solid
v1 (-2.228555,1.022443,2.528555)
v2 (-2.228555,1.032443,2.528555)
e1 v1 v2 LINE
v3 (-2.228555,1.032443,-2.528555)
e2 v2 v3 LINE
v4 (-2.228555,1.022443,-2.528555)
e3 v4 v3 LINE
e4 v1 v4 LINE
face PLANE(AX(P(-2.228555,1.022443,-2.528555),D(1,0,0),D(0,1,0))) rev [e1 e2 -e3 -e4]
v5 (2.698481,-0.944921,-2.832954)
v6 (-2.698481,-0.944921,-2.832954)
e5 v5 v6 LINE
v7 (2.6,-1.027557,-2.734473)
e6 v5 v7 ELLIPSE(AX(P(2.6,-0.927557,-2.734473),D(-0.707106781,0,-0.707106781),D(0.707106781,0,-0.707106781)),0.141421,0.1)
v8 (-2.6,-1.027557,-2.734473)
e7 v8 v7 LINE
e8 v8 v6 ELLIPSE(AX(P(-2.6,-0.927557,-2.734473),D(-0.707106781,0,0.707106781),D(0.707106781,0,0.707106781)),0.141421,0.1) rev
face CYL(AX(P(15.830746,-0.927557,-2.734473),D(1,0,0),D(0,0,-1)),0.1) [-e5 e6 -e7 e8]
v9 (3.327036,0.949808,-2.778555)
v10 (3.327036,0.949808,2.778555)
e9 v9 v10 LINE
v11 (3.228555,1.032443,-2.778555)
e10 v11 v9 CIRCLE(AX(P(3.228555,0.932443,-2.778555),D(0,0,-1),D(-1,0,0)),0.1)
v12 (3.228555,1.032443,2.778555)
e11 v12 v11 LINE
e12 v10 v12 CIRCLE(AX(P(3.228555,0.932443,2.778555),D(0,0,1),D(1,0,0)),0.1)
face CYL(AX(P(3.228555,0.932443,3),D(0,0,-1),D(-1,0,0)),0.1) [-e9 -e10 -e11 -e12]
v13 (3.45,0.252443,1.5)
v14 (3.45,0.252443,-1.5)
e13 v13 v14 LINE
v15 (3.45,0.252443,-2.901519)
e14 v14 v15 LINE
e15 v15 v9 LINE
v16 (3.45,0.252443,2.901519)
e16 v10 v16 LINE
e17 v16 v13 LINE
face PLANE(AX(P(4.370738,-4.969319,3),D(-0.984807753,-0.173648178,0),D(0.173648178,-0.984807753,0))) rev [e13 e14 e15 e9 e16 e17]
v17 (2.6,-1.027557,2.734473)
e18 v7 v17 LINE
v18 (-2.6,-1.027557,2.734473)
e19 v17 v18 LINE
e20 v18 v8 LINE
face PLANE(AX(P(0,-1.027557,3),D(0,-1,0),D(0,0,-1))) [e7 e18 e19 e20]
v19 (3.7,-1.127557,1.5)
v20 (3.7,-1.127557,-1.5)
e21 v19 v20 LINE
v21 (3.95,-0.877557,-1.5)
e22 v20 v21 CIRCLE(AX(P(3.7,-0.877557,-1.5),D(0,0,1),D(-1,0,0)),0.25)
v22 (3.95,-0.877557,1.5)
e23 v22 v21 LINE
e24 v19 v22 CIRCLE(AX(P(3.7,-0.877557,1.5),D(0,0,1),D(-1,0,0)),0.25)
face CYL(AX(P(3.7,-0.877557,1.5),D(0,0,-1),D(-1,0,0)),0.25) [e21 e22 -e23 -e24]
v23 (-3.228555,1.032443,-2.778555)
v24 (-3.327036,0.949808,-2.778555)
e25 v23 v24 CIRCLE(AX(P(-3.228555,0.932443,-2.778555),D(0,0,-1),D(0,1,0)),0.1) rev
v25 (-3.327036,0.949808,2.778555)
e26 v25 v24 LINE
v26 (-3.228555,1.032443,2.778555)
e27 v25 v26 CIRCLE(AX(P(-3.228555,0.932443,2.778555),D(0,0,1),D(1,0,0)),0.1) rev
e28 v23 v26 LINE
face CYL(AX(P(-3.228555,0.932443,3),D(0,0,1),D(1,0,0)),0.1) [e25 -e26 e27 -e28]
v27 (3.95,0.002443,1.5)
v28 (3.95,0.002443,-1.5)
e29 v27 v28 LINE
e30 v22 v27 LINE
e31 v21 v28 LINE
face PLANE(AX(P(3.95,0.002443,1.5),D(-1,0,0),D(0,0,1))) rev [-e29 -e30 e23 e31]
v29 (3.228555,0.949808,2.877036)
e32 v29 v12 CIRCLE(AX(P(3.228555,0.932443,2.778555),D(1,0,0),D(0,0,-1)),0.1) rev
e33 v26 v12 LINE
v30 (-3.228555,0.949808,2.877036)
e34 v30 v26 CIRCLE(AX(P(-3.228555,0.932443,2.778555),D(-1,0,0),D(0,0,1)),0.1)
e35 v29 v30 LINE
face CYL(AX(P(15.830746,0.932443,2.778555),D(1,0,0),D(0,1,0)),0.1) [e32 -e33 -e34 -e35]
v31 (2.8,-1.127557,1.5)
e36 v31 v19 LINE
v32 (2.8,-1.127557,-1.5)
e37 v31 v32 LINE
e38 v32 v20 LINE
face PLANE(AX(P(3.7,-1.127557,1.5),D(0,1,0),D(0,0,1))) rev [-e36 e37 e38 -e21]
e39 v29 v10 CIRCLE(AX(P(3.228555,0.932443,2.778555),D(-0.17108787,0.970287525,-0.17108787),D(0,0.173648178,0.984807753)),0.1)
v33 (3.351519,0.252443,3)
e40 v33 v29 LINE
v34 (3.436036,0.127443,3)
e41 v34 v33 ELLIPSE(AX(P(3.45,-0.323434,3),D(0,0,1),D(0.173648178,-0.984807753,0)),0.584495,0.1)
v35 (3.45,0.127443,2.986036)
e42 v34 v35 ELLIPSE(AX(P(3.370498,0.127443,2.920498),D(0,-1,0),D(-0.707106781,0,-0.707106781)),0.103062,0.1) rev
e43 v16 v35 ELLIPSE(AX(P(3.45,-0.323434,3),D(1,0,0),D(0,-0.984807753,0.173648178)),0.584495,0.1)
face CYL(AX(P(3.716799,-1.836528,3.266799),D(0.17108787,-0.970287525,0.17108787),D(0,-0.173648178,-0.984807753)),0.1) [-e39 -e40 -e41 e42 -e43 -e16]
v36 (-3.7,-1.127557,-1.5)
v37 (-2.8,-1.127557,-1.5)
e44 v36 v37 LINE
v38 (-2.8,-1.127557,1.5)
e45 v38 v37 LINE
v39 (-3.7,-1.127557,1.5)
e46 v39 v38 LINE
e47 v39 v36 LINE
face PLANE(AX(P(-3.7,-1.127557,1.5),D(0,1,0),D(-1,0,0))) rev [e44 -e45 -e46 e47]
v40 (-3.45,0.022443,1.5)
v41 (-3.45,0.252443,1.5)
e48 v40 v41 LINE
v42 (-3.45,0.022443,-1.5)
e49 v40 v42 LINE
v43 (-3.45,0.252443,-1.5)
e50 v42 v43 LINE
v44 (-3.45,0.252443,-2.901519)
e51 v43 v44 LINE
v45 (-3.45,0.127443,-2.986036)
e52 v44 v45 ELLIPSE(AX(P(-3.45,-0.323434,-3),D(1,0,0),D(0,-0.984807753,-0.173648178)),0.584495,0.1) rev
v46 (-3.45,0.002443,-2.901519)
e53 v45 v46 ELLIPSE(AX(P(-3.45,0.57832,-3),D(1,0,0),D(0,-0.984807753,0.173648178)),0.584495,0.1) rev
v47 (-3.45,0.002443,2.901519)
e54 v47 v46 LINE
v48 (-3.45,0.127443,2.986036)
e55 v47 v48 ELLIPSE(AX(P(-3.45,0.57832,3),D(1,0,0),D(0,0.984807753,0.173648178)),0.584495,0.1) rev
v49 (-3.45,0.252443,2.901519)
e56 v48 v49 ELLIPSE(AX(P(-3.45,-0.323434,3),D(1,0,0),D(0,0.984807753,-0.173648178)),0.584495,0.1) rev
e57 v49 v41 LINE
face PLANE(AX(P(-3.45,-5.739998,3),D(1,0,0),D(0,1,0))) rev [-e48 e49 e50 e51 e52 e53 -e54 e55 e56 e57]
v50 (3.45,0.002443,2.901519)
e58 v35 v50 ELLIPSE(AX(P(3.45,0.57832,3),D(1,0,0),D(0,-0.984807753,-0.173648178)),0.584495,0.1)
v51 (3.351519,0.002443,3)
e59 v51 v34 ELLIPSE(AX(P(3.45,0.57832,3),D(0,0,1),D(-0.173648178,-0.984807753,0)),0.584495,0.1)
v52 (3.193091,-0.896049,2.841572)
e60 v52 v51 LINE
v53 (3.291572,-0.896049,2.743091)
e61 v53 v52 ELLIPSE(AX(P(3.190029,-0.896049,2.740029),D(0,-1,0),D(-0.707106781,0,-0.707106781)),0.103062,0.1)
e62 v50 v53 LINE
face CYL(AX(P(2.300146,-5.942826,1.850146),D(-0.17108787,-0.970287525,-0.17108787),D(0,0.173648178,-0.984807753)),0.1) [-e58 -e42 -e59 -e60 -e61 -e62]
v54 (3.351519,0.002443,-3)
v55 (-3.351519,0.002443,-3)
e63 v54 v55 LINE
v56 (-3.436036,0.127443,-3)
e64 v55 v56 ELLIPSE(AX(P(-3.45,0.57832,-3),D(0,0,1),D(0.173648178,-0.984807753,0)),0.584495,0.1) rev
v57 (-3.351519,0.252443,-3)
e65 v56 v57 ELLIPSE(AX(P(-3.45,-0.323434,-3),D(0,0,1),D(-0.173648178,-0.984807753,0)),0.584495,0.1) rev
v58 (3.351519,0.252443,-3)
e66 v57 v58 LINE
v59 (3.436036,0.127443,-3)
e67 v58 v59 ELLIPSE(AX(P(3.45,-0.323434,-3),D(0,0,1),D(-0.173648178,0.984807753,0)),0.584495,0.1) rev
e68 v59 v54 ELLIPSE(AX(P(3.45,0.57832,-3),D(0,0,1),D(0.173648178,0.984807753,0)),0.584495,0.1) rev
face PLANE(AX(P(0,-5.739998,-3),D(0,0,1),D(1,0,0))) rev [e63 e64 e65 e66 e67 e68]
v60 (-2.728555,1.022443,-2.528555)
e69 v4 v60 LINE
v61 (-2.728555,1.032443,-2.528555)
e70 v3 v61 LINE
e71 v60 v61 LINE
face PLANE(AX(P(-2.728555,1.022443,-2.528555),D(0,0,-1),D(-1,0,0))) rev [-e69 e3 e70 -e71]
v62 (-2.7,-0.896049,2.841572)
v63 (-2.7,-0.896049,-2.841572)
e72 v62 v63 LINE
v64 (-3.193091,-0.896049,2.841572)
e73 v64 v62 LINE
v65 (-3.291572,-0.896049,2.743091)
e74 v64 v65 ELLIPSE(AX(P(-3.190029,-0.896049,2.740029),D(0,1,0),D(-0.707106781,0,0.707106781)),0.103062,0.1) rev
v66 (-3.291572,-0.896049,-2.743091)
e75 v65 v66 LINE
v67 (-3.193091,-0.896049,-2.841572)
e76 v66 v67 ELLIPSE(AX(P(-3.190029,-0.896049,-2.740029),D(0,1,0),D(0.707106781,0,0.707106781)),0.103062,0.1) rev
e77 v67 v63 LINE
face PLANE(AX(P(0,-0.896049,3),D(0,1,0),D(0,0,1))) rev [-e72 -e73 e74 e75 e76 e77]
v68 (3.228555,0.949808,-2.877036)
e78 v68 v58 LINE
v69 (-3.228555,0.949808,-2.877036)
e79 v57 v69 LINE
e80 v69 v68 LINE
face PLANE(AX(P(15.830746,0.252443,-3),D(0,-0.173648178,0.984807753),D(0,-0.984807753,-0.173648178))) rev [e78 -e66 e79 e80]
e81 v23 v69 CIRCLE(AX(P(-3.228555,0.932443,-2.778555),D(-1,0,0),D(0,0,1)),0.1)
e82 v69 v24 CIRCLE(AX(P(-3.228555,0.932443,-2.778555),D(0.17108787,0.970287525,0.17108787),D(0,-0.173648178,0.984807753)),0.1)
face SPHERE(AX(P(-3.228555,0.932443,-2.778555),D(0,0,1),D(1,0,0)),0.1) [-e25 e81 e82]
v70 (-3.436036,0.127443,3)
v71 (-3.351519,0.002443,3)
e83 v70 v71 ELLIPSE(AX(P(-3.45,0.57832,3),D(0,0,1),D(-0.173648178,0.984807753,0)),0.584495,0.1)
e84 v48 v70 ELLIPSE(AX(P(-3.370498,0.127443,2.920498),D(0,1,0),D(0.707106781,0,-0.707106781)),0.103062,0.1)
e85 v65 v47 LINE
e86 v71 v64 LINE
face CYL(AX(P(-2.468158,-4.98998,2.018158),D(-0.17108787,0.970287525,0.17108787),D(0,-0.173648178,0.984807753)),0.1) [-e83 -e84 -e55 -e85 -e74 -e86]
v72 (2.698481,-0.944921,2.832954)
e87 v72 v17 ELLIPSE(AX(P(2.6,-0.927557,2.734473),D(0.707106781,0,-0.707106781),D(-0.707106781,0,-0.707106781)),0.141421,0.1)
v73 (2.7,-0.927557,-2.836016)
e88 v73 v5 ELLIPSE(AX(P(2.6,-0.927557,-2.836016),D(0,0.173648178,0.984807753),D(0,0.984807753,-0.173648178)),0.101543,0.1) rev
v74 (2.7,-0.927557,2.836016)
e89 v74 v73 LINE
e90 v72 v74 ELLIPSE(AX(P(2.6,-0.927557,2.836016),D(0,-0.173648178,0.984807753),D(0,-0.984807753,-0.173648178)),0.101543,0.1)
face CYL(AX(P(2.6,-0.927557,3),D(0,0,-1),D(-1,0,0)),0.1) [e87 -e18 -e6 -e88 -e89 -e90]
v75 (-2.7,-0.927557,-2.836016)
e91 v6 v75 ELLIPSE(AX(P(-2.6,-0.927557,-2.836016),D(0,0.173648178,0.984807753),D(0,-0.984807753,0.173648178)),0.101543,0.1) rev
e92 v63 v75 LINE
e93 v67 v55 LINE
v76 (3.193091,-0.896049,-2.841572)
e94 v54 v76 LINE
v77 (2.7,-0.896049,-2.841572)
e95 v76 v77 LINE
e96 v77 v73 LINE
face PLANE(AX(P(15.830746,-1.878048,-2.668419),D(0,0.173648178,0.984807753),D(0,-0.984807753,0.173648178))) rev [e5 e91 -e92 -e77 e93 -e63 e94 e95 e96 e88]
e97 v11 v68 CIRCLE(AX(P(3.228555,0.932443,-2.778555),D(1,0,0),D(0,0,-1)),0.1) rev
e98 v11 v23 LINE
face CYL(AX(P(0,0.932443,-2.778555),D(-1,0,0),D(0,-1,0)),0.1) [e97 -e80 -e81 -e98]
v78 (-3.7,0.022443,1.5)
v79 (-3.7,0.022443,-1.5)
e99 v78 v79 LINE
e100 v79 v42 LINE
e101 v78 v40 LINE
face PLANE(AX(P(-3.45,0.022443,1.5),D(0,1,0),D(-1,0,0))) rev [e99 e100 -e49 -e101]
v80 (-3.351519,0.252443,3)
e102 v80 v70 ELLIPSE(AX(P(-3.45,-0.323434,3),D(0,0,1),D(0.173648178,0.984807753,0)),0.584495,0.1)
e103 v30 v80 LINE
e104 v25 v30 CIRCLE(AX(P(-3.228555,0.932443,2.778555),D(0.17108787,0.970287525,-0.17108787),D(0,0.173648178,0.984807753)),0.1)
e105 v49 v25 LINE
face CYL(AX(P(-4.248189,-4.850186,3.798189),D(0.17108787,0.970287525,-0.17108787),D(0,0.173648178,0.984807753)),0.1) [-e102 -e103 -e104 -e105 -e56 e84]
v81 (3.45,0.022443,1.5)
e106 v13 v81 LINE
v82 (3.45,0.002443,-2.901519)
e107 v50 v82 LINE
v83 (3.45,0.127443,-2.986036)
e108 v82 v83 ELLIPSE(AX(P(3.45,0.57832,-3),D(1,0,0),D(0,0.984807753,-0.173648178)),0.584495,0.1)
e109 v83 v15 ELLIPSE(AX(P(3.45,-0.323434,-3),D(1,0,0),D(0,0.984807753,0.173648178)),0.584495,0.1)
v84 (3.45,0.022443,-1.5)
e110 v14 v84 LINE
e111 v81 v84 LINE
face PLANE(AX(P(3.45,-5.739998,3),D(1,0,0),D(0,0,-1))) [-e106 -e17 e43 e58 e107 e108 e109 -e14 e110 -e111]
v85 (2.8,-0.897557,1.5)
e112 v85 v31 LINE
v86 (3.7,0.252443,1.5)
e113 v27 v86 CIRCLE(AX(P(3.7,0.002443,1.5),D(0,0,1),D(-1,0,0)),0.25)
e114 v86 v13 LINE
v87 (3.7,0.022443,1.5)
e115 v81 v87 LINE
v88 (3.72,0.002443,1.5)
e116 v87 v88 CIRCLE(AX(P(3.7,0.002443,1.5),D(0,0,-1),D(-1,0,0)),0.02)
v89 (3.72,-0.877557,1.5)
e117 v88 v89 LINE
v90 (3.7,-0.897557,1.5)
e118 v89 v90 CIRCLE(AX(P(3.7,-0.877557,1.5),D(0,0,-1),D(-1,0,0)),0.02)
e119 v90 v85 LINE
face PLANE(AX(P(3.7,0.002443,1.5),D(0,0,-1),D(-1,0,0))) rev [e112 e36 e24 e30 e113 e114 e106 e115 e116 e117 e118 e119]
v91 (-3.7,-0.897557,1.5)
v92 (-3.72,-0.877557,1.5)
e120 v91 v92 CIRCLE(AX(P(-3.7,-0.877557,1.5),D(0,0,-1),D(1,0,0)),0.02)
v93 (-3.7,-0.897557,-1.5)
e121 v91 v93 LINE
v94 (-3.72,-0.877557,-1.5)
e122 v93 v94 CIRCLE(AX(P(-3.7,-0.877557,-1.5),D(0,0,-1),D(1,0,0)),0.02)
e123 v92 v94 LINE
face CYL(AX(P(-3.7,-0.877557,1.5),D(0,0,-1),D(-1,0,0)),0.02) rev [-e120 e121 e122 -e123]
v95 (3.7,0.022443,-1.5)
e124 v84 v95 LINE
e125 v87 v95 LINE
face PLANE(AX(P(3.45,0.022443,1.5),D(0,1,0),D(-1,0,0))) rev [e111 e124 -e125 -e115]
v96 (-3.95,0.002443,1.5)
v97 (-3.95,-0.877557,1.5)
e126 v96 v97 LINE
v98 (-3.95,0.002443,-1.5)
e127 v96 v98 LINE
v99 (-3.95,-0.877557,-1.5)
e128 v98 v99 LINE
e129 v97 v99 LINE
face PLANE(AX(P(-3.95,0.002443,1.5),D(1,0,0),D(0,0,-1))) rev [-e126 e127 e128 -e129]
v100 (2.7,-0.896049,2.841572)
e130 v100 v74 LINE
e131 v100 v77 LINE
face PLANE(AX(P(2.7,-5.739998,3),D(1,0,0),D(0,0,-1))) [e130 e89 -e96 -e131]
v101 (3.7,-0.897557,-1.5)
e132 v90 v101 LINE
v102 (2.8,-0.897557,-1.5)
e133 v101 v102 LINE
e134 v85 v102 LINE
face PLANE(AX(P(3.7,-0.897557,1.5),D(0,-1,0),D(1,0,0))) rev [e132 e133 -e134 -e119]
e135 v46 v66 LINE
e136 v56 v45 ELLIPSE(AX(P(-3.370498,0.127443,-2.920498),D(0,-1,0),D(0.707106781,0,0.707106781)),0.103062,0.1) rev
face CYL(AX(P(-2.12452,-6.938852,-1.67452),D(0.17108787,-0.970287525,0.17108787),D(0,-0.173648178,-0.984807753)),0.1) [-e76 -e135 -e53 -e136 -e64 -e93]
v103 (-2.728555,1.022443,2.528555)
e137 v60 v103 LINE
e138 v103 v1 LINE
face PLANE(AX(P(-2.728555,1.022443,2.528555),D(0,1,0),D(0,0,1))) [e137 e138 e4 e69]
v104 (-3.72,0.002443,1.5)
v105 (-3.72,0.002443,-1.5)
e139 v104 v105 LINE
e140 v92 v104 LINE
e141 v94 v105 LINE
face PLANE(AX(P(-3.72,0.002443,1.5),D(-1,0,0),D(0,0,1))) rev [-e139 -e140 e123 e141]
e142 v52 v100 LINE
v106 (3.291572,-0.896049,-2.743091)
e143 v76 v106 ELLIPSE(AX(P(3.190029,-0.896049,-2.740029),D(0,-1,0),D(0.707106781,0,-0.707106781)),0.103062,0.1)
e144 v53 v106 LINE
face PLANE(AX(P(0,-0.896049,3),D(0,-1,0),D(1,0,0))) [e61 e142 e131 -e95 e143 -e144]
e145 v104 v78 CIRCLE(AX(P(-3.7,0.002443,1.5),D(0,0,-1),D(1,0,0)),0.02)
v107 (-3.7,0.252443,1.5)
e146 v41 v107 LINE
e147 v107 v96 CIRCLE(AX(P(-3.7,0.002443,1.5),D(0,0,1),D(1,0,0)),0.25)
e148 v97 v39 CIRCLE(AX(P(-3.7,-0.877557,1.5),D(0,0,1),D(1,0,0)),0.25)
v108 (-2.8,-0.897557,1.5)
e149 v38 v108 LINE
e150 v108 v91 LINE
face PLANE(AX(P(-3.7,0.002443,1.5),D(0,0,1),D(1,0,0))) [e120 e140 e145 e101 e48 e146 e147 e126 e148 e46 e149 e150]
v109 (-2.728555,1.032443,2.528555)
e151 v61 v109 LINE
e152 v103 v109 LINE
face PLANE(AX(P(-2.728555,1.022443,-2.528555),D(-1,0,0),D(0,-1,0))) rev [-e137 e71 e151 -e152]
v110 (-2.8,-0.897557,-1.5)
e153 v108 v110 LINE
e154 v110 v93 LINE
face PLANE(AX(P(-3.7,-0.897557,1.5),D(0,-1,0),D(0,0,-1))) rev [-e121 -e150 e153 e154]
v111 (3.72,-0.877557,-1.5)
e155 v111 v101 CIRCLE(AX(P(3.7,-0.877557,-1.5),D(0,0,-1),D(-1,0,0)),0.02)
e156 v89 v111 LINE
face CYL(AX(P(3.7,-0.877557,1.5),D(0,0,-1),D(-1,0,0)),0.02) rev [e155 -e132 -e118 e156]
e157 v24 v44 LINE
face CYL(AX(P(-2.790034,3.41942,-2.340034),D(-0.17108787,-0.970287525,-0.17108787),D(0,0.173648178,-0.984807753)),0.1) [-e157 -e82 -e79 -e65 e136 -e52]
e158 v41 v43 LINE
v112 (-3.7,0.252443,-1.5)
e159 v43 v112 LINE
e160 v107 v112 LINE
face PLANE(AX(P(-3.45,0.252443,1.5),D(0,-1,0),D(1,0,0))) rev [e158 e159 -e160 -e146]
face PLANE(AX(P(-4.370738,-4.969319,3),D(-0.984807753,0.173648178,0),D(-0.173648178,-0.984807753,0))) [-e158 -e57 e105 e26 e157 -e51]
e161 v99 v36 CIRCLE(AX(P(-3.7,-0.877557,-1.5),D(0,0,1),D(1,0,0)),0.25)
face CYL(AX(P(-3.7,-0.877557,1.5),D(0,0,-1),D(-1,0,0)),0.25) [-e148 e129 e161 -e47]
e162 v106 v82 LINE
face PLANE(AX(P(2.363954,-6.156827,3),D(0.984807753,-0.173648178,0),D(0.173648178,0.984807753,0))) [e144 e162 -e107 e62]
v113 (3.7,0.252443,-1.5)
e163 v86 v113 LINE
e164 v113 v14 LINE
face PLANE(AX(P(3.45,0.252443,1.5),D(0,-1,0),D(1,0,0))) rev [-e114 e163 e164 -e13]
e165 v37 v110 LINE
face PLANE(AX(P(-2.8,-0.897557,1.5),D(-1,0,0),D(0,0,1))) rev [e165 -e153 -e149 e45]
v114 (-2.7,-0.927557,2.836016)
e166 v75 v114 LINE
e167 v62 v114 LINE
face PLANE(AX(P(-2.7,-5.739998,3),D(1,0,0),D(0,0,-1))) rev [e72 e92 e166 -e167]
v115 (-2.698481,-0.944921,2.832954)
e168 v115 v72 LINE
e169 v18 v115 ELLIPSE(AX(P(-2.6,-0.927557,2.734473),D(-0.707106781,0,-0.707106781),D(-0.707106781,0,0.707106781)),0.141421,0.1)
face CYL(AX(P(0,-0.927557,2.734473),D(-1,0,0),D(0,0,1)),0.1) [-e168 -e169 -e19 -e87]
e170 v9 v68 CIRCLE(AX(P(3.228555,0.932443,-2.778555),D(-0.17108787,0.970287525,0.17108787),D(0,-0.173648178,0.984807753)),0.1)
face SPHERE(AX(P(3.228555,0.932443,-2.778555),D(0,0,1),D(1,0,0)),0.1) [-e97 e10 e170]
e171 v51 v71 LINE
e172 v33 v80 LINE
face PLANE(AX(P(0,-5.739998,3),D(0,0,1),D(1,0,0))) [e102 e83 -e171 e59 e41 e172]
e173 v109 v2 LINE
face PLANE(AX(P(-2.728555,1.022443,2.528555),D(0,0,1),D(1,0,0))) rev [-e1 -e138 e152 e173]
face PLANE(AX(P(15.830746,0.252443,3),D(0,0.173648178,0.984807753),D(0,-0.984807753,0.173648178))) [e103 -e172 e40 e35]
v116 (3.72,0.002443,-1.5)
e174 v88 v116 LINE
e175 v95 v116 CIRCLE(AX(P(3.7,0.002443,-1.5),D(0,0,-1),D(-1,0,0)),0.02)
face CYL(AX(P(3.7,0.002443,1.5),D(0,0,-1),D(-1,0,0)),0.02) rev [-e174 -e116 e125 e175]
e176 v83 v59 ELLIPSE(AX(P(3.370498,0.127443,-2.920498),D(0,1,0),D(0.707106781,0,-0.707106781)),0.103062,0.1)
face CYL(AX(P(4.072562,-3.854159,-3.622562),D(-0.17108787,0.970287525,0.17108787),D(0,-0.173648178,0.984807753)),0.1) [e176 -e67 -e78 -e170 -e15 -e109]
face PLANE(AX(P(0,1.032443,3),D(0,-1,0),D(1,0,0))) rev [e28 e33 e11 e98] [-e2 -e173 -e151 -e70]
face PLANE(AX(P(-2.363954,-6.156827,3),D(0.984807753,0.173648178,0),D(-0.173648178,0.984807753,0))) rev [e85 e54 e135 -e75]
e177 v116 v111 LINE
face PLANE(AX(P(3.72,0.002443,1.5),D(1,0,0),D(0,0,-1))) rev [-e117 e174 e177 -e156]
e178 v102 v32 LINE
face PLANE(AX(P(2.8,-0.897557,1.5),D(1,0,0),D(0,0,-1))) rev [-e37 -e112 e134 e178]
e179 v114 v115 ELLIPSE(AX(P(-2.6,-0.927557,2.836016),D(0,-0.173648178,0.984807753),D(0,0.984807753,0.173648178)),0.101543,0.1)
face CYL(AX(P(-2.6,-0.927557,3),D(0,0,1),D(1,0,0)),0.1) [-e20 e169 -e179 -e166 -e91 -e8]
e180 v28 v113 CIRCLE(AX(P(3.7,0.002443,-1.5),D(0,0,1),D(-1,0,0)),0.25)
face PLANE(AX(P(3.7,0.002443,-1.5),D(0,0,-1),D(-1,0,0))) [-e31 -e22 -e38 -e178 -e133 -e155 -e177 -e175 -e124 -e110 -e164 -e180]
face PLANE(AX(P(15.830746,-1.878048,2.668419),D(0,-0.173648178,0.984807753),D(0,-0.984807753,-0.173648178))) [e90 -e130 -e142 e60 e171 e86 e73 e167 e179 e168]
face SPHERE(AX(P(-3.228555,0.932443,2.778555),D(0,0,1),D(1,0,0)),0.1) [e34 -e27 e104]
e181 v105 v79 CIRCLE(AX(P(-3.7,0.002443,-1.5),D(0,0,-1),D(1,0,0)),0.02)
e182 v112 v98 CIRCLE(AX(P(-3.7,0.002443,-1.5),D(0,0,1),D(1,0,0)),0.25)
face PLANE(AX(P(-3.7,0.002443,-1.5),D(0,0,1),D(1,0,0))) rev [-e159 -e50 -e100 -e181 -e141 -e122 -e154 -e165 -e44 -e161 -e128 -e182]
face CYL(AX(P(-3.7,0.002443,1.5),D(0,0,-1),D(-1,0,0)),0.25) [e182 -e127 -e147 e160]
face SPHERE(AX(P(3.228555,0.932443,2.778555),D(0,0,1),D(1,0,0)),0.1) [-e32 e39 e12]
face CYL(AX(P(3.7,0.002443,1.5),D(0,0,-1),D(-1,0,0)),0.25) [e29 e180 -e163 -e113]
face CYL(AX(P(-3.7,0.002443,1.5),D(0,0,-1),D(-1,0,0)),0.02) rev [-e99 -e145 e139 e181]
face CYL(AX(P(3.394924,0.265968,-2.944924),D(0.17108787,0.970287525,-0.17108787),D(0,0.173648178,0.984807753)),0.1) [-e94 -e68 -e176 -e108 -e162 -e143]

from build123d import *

# Parameters (mm, degrees)
EXTRUDE2_DEPTH  = 3
EXTRUDE10_DEPTH = 5.687050188
EXTRUDE6_DEPTH  = 1.5
FILLET1_R       = 0.1
SKETCH17_W      = 0.5
SKETCH17_H      = 5.057109984
EXTRUDE11_DEPTH = 0.01


with BuildPart() as part:
    # Sketch5 → Extrude2 (new, symmetric)
    with BuildSketch(Plane.XY):
        Polygon((-3.45, 0.252443442), (-3.45, 0.002443442), (-3.291571563, -0.896048874), (-2.7, -0.896048874), (-2.7, -1.027556558), (2.7, -1.027556558), (2.7, -0.896048874), (3.291571563, -0.896048874), (3.45, 0.002443442), (3.45, 0.252443442), (3.312464955, 1.032443442), (-3.312464955, 1.032443442), align=None)
    extrude(amount=EXTRUDE2_DEPTH, both=True)

    # Sketch15 → Extrude10 (cut, symmetric)
    with BuildSketch(Plane(origin=(0, 0, 0), x_dir=(0, 0, -1), z_dir=(1, 0, 0))):
        Polygon((-1.365649055, -24.756382672), (2.66841867, -1.878047724), (3, 0.002443442), (3, 0.252443442), (2.606426498, 2.484509687), (-1.427641227, 25.362844635), (45.034863515, 25.420313828), (45.096855687, -24.698913478), align=None)
    extrude10 = extrude(amount=EXTRUDE10_DEPTH, both=True, mode=Mode.SUBTRACT)

    # Mirror1: Extrude10 across plane
    add(extrude10.mirror(Plane.XY), mode=Mode.SUBTRACT)

    # Sketch9 → Extrude6 (add, symmetric)
    with BuildSketch(Plane.XY):
        with BuildLine():
            Line((-3.45, 0.252443442), (-3.7, 0.252443442))
            ThreePointArc((-3.7, 0.252443442), (-3.876776695, 0.179220137), (-3.95, 0.002443442))
            Line((-3.95, 0.002443442), (-3.95, -0.877556558))
            ThreePointArc((-3.95, -0.877556558), (-3.876776695, -1.054333254), (-3.7, -1.127556558))
            Line((-3.7, -1.127556558), (-2.8, -1.127556558))
            Line((-2.8, -1.127556558), (-2.8, -0.897556558))
            Line((-2.8, -0.897556558), (-3.7, -0.897556558))
            ThreePointArc((-3.7, -0.897556558), (-3.714142136, -0.891698694), (-3.72, -0.877556558))
            Line((-3.72, -0.877556558), (-3.72, 0.002443442))
            ThreePointArc((-3.72, 0.002443442), (-3.714142136, 0.016585577), (-3.7, 0.022443442))
            Line((-3.7, 0.022443442), (-3.45, 0.022443442))
            Line((-3.45, 0.022443442), (-3.45, 0.252443442))
        make_face()
        with BuildLine():
            Line((3.45, 0.252443442), (3.45, 0.022443442))
            Line((3.45, 0.022443442), (3.7, 0.022443442))
            ThreePointArc((3.7, 0.022443442), (3.714142136, 0.016585577), (3.72, 0.002443442))
            Line((3.72, 0.002443442), (3.72, -0.877556558))
            ThreePointArc((3.72, -0.877556558), (3.714142136, -0.891698694), (3.7, -0.897556558))
            Line((3.7, -0.897556558), (2.8, -0.897556558))
            Line((2.8, -0.897556558), (2.8, -1.127556558))
            Line((2.8, -1.127556558), (3.7, -1.127556558))
            ThreePointArc((3.7, -1.127556558), (3.876776695, -1.054333254), (3.95, -0.877556558))
            Line((3.95, -0.877556558), (3.95, 0.002443442))
            ThreePointArc((3.95, 0.002443442), (3.876776695, 0.179220137), (3.7, 0.252443442))
            Line((3.7, 0.252443442), (3.45, 0.252443442))
        make_face()
    extrude(amount=EXTRUDE6_DEPTH, both=True)

    # Fillet1
    # the kernel refuses this fillet: 0.1 mm, written as the material it takes off along each edge
    with BuildSketch(Plane(origin=(-3.228554992, 0.932443442, 2.778554992), x_dir=(-0.707106781186547, 0, -0.707106781186548), z_dir=(-0.508220601732601, 0.6952867321825629, 0.5082206017326002))) as fillet1_piece_1_section:
        Polygon((-0.186219601, -0.186219601), (0.186219601, -0.186219601), (0.186219601, 0.186219601), (-0.186219601, 0.186219601), align=None)
    fillet1_piece_1 = extrude(amount=0.186219601, mode=Mode.PRIVATE)
    fillet1_piece_1 = split(fillet1_piece_1, bisect_by=Plane(origin=(-3.228554992, 0.932443442, 2.778554992), z_dir=(0, 0, 1)), keep=Keep.TOP, mode=Mode.PRIVATE)
    fillet1_piece_1 = split(fillet1_piece_1, bisect_by=Plane(origin=(-3.228554992, 0.932443442, 2.778554992), z_dir=(0.17108786974602874, 0.9702875252478149, -0.1710878697460364)), keep=Keep.TOP, mode=Mode.PRIVATE)
    fillet1_piece_1 = split(fillet1_piece_1, bisect_by=Plane(origin=(-3.228554992, 0.932443442, 2.778554992), z_dir=(-1, 0, 0)), keep=Keep.TOP, mode=Mode.PRIVATE)
    fillet1_piece_1 = split(fillet1_piece_1, bisect_by=Plane(origin=(-3.228554992, 1.032443442, 2.778554992), z_dir=(0, -1, 0)), keep=Keep.TOP, mode=Mode.PRIVATE)
    fillet1_piece_1 = split(fillet1_piece_1, bisect_by=Plane(origin=(-3.327035767, 0.94980826, 2.778554992), z_dir=(0.9848077530122094, -0.17364817766692353, 0)), keep=Keep.TOP, mode=Mode.PRIVATE)
    fillet1_piece_1 = split(fillet1_piece_1, bisect_by=Plane(origin=(-3.228554992, 0.94980826, 2.877035767), z_dir=(0, -0.17364817766693108, -0.984807753012208)), keep=Keep.TOP, mode=Mode.PRIVATE)
    fillet1_piece_1 = fillet1_piece_1 - Plane(origin=(-3.228554992, 0.932443442, 2.778554992), x_dir=(0.508220601732601, -0.6952867321825629, -0.5082206017326002), z_dir=(-0.707106781186547, 0, -0.707106781186548)) * Sphere(FILLET1_R, mode=Mode.PRIVATE)
    add(fillet1_piece_1, mode=Mode.SUBTRACT)
    with BuildSketch(Plane(origin=(-3.228554992, 0.932443442, -2.778554992), x_dir=(0.707106781186547, 0, -0.707106781186548), z_dir=(-0.508220601732601, 0.6952867321825629, -0.5082206017326002))) as fillet1_piece_2_section:
        Polygon((-0.186219601, -0.186219601), (0.186219601, -0.186219601), (0.186219601, 0.186219601), (-0.186219601, 0.186219601), align=None)
    fillet1_piece_2 = extrude(amount=0.186219601, mode=Mode.PRIVATE)
    fillet1_piece_2 = split(fillet1_piece_2, bisect_by=Plane(origin=(-3.228554992, 0.932443442, -2.778554992), z_dir=(0, 0, -1)), keep=Keep.TOP, mode=Mode.PRIVATE)
    fillet1_piece_2 = split(fillet1_piece_2, bisect_by=Plane(origin=(-3.228554992, 0.932443442, -2.778554992), z_dir=(0.17108786974602874, 0.9702875252478149, 0.1710878697460364)), keep=Keep.TOP, mode=Mode.PRIVATE)
    fillet1_piece_2 = split(fillet1_piece_2, bisect_by=Plane(origin=(-3.228554992, 0.932443442, -2.778554992), z_dir=(-1, 0, 0)), keep=Keep.TOP, mode=Mode.PRIVATE)
    fillet1_piece_2 = split(fillet1_piece_2, bisect_by=Plane(origin=(-3.228554992, 1.032443442, -2.778554992), z_dir=(0, -1, 0)), keep=Keep.TOP, mode=Mode.PRIVATE)
    fillet1_piece_2 = split(fillet1_piece_2, bisect_by=Plane(origin=(-3.327035767, 0.94980826, -2.778554992), z_dir=(0.9848077530122094, -0.17364817766692353, 0)), keep=Keep.TOP, mode=Mode.PRIVATE)
    fillet1_piece_2 = split(fillet1_piece_2, bisect_by=Plane(origin=(-3.228554992, 0.94980826, -2.877035767), z_dir=(0, -0.17364817766693108, 0.984807753012208)), keep=Keep.TOP, mode=Mode.PRIVATE)
    fillet1_piece_2 = fillet1_piece_2 - Plane(origin=(-3.228554992, 0.932443442, -2.778554992), x_dir=(0.508220601732601, -0.6952867321825629, 0.5082206017326002), z_dir=(0.707106781186547, 0, -0.707106781186548)) * Sphere(FILLET1_R, mode=Mode.PRIVATE)
    add(fillet1_piece_2, mode=Mode.SUBTRACT)
    with BuildSketch(Plane(origin=(3.228554992, 0.932443442, -2.778554992), x_dir=(0.707106781186547, 0, 0.707106781186548), z_dir=(0.508220601732601, 0.6952867321825628, -0.5082206017326003))) as fillet1_piece_3_section:
        Polygon((-0.186219601, -0.186219601), (0.186219601, -0.186219601), (0.186219601, 0.186219601), (-0.186219601, 0.186219601), align=None)
    fillet1_piece_3 = extrude(amount=0.186219601, mode=Mode.PRIVATE)
    fillet1_piece_3 = split(fillet1_piece_3, bisect_by=Plane(origin=(3.228554992, 0.932443442, -2.778554992), z_dir=(0, 0, -1)), keep=Keep.TOP, mode=Mode.PRIVATE)
    fillet1_piece_3 = split(fillet1_piece_3, bisect_by=Plane(origin=(3.228554992, 0.932443442, -2.778554992), z_dir=(-0.17108786974602816, 0.970287525247815, 0.17108786974603643)), keep=Keep.TOP, mode=Mode.PRIVATE)
    fillet1_piece_3 = split(fillet1_piece_3, bisect_by=Plane(origin=(3.228554992, 0.932443442, -2.778554992), z_dir=(1, 0, 0)), keep=Keep.TOP, mode=Mode.PRIVATE)
    fillet1_piece_3 = split(fillet1_piece_3, bisect_by=Plane(origin=(3.228554992, 1.032443442, -2.778554992), z_dir=(0, -1, 0)), keep=Keep.TOP, mode=Mode.PRIVATE)
    fillet1_piece_3 = split(fillet1_piece_3, bisect_by=Plane(origin=(3.327035767, 0.94980826, -2.778554992), z_dir=(-0.9848077530122094, -0.17364817766692292, 0)), keep=Keep.TOP, mode=Mode.PRIVATE)
    fillet1_piece_3 = split(fillet1_piece_3, bisect_by=Plane(origin=(3.228554992, 0.94980826, -2.877035767), z_dir=(0, -0.17364817766693108, 0.984807753012208)), keep=Keep.TOP, mode=Mode.PRIVATE)
    fillet1_piece_3 = fillet1_piece_3 - Plane(origin=(3.228554992, 0.932443442, -2.778554992), x_dir=(-0.508220601732601, -0.6952867321825628, 0.5082206017326003), z_dir=(0.707106781186547, 0, 0.707106781186548)) * Sphere(FILLET1_R, mode=Mode.PRIVATE)
    add(fillet1_piece_3, mode=Mode.SUBTRACT)
    with BuildSketch(Plane(origin=(3.228554992, 0.932443442, 2.778554992), x_dir=(-0.707106781186547, 0, 0.707106781186548), z_dir=(0.508220601732601, 0.6952867321825628, 0.5082206017326003))) as fillet1_piece_4_section:
        Polygon((-0.186219601, -0.186219601), (0.186219601, -0.186219601), (0.186219601, 0.186219601), (-0.186219601, 0.186219601), align=None)
    fillet1_piece_4 = extrude(amount=0.186219601, mode=Mode.PRIVATE)
    fillet1_piece_4 = split(fillet1_piece_4, bisect_by=Plane(origin=(3.228554992, 0.932443442, 2.778554992), z_dir=(0, 0, 1)), keep=Keep.TOP, mode=Mode.PRIVATE)
    fillet1_piece_4 = split(fillet1_piece_4, bisect_by=Plane(origin=(3.228554992, 0.932443442, 2.778554992), z_dir=(-0.17108786974602816, 0.970287525247815, -0.17108786974603643)), keep=Keep.TOP, mode=Mode.PRIVATE)
    fillet1_piece_4 = split(fillet1_piece_4, bisect_by=Plane(origin=(3.228554992, 0.932443442, 2.778554992), z_dir=(1, 0, 0)), keep=Keep.TOP, mode=Mode.PRIVATE)
    fillet1_piece_4 = split(fillet1_piece_4, bisect_by=Plane(origin=(3.228554992, 1.032443442, 2.778554992), z_dir=(0, -1, 0)), keep=Keep.TOP, mode=Mode.PRIVATE)
    fillet1_piece_4 = split(fillet1_piece_4, bisect_by=Plane(origin=(3.327035767, 0.94980826, 2.778554992), z_dir=(-0.9848077530122094, -0.17364817766692292, 0)), keep=Keep.TOP, mode=Mode.PRIVATE)
    fillet1_piece_4 = split(fillet1_piece_4, bisect_by=Plane(origin=(3.228554992, 0.94980826, 2.877035767), z_dir=(0, -0.17364817766693108, -0.984807753012208)), keep=Keep.TOP, mode=Mode.PRIVATE)
    fillet1_piece_4 = fillet1_piece_4 - Plane(origin=(3.228554992, 0.932443442, 2.778554992), x_dir=(-0.508220601732601, -0.6952867321825628, -0.5082206017326003), z_dir=(-0.707106781186547, 0, 0.707106781186548)) * Sphere(FILLET1_R, mode=Mode.PRIVATE)
    add(fillet1_piece_4, mode=Mode.SUBTRACT)
    with BuildSketch(Plane(origin=(-2.909774908, -1.027556558, -2.81838321), x_dir=(0, 0.9848077530122077, -0.17364817766693205), z_dir=(1, 0, 0))) as fillet1_piece_5:
        with BuildLine():
            CenterArc((FILLET1_R * 0.839099631177, FILLET1_R), FILLET1_R, 190, 80)
            Line((-FILLET1_R * 0.145708121835, FILLET1_R * 0.826351822333), (0, 0))
            Line((0, 0), (FILLET1_R * 0.839099631177, 0))
        make_face()
    extrude(amount=5.819549816, mode=Mode.SUBTRACT)
    with BuildSketch(Plane(origin=(-2.7, -1.027556558, -3.06838321), x_dir=(0, 1, 0), z_dir=(0, 0, 1)), Plane(origin=(2.7, -1.027556558, -3.06838321), x_dir=(-1, 0, 0), z_dir=(0, 0, 1))) as fillet1_piece_6:
        with BuildLine():
            CenterArc((FILLET1_R, -FILLET1_R), FILLET1_R, 90, 90)
            Line((0, -FILLET1_R), (0, 0))
            Line((0, 0), (FILLET1_R, 0))
        make_face()
    extrude(amount=6.13676642, mode=Mode.SUBTRACT)
    with BuildSketch(Plane(origin=(-2.909774908, -1.027556558, 2.81838321), x_dir=(0, 0.9848077530122077, 0.17364817766693205), z_dir=(1, 0, 0))) as fillet1_piece_7:
        with BuildLine():
            CenterArc((FILLET1_R * 0.839099631177, -FILLET1_R), FILLET1_R, 90, 80)
            Line((-FILLET1_R * 0.145708121835, -FILLET1_R * 0.826351822333), (0, 0))
            Line((0, 0), (FILLET1_R * 0.839099631177, 0))
        make_face()
    extrude(amount=5.819549816, mode=Mode.SUBTRACT)
    with BuildSketch(Plane(origin=(-3.312464955, 1.032443442, 2.778554992), x_dir=(-0.17364817766692459, -0.9848077530122091, 0), z_dir=(0, 0, -1)), Plane(origin=(3.312464955, 1.032443442, 2.778554992), x_dir=(-1, 0, 0), z_dir=(0, 0, -1))) as fillet1_piece_8:
        with BuildLine():
            CenterArc((FILLET1_R * 0.839099631177, -FILLET1_R), FILLET1_R, 90, 80)
            Line((-FILLET1_R * 0.145708121835, -FILLET1_R * 0.826351822333), (0, 0))
            Line((0, 0), (FILLET1_R * 0.839099631177, 0))
        make_face()
    extrude(amount=5.557109984, mode=Mode.SUBTRACT)
    with BuildSketch(Plane(origin=(3.228554992, 1.032443442, -2.862464955), x_dir=(0, 0, 1), z_dir=(-1, 0, 0))) as fillet1_piece_9:
        with BuildLine():
            CenterArc((FILLET1_R * 0.839099631177, -FILLET1_R), FILLET1_R, 90, 80)
            Line((-FILLET1_R * 0.145708121835, -FILLET1_R * 0.826351822333), (0, 0))
            Line((0, 0), (FILLET1_R * 0.839099631177, 0))
        make_face()
    extrude(amount=6.457109984, mode=Mode.SUBTRACT)
    with BuildSketch(Plane(origin=(3.228554992, 1.032443442, 2.862464955), x_dir=(0, 0, -1), z_dir=(-1, 0, 0))) as fillet1_piece_10:
        with BuildLine():
            CenterArc((FILLET1_R * 0.839099631177, FILLET1_R), FILLET1_R, 190, 80)
            Line((-FILLET1_R * 0.145708121835, FILLET1_R * 0.826351822333), (0, 0))
            Line((0, 0), (FILLET1_R * 0.839099631177, 0))
        make_face()
    extrude(amount=6.457109984, mode=Mode.SUBTRACT)
    with BuildSketch(Plane(origin=(-3.574503319, 0.708536853, -3.124503319), x_dir=(-0.029709096802312214, 0.16848866057223963, 0.985255774317392), z_dir=(0.17108786974603277, -0.9702875252478144, 0.17108786974603588)), Plane(origin=(3.250070456, -1.131413344, 2.800070456), x_dir=(-0.9852557743173926, 0.1684886605722357, 0.029709096802311194), z_dir=(0.17108786974603182, 0.9702875252478146, 0.1710878697460359))) as fillet1_piece_11:
        with BuildLine():
            CenterArc((FILLET1_R * 0.970287525248, -FILLET1_R), FILLET1_R, 90, 88.272058928)
            Line((-FILLET1_R * 0.0292577488659, -FILLET1_R * 0.969846310393), (0, 0))
            Line((0, 0), (FILLET1_R * 0.970287525248, 0))
        make_face()
    extrude(amount=1.896293778, mode=Mode.SUBTRACT)
    with BuildSketch(Plane(origin=(-3.324153131, 0.966156504, -2.874153131), x_dir=(-0.029709096802307676, -0.16848866057224096, 0.9852557743173918), z_dir=(-0.17108786974602877, -0.970287525247815, -0.17108786974603643)), Plane(origin=(3.574503319, -0.453649969, 3.124503319), x_dir=(-0.9852557743173932, -0.16848866057223175, 0.02970909680231244), z_dir=(-0.17108786974602816, 0.970287525247815, -0.17108786974603643))) as fillet1_piece_12:
        with BuildLine():
            CenterArc((FILLET1_R * 0.970287525248, -FILLET1_R), FILLET1_R, 90, 88.272058928)
            Line((-FILLET1_R * 0.0292577488659, -FILLET1_R * 0.969846310393), (0, 0))
            Line((0, 0), (FILLET1_R * 0.970287525248, 0))
        make_face()
    extrude(amount=1.46328427, mode=Mode.SUBTRACT)
    with BuildSketch(Plane(origin=(-3.324153131, 0.966156504, 2.874153131), x_dir=(-0.029709096802303235, -0.16848866057224177, -0.9852557743173918), z_dir=(-0.17108786974602877, -0.970287525247815, 0.17108786974603643)), Plane(origin=(3.574503319, -0.453649969, -3.124503319), x_dir=(-0.9852557743173932, -0.16848866057223175, -0.02970909680231244), z_dir=(-0.17108786974602816, 0.970287525247815, 0.17108786974603643))) as fillet1_piece_13:
        with BuildLine():
            CenterArc((FILLET1_R * 0.970287525248, FILLET1_R), FILLET1_R, 181.727941072, 88.272058928)
            Line((-FILLET1_R * 0.0292577488659, FILLET1_R * 0.969846310393), (0, 0))
            Line((0, 0), (FILLET1_R * 0.970287525248, 0))
        make_face()
    extrude(amount=1.46328427, mode=Mode.SUBTRACT)
    with BuildSketch(Plane(origin=(-3.574503319, 0.708536853, 3.124503319), x_dir=(-0.029709096802312214, 0.16848866057223963, -0.985255774317392), z_dir=(0.17108786974603277, -0.9702875252478144, -0.17108786974603588)), Plane(origin=(3.250070456, -1.131413344, -2.800070456), x_dir=(-0.9852557743173926, 0.1684886605722357, -0.029709096802311194), z_dir=(0.17108786974603182, 0.9702875252478146, -0.1710878697460359))) as fillet1_piece_14:
        with BuildLine():
            CenterArc((FILLET1_R * 0.970287525248, FILLET1_R), FILLET1_R, 181.727941072, 88.272058928)
            Line((-FILLET1_R * 0.0292577488659, FILLET1_R * 0.969846310393), (0, 0))
            Line((0, 0), (FILLET1_R * 0.970287525248, 0))
        make_face()
    extrude(amount=1.896293778, mode=Mode.SUBTRACT)

    # Sketch17 → Extrude11 (cut)
    with BuildSketch(Plane(origin=(0, 1.032443442, 0), x_dir=(1, 0, 0), z_dir=(0, 1, 0))):
        with Locations((-2.478554992, 0)):
            Rectangle(SKETCH17_W, SKETCH17_H)
    extrude(amount=-EXTRUDE11_DEPTH, mode=Mode.SUBTRACT)


solid = part.part
